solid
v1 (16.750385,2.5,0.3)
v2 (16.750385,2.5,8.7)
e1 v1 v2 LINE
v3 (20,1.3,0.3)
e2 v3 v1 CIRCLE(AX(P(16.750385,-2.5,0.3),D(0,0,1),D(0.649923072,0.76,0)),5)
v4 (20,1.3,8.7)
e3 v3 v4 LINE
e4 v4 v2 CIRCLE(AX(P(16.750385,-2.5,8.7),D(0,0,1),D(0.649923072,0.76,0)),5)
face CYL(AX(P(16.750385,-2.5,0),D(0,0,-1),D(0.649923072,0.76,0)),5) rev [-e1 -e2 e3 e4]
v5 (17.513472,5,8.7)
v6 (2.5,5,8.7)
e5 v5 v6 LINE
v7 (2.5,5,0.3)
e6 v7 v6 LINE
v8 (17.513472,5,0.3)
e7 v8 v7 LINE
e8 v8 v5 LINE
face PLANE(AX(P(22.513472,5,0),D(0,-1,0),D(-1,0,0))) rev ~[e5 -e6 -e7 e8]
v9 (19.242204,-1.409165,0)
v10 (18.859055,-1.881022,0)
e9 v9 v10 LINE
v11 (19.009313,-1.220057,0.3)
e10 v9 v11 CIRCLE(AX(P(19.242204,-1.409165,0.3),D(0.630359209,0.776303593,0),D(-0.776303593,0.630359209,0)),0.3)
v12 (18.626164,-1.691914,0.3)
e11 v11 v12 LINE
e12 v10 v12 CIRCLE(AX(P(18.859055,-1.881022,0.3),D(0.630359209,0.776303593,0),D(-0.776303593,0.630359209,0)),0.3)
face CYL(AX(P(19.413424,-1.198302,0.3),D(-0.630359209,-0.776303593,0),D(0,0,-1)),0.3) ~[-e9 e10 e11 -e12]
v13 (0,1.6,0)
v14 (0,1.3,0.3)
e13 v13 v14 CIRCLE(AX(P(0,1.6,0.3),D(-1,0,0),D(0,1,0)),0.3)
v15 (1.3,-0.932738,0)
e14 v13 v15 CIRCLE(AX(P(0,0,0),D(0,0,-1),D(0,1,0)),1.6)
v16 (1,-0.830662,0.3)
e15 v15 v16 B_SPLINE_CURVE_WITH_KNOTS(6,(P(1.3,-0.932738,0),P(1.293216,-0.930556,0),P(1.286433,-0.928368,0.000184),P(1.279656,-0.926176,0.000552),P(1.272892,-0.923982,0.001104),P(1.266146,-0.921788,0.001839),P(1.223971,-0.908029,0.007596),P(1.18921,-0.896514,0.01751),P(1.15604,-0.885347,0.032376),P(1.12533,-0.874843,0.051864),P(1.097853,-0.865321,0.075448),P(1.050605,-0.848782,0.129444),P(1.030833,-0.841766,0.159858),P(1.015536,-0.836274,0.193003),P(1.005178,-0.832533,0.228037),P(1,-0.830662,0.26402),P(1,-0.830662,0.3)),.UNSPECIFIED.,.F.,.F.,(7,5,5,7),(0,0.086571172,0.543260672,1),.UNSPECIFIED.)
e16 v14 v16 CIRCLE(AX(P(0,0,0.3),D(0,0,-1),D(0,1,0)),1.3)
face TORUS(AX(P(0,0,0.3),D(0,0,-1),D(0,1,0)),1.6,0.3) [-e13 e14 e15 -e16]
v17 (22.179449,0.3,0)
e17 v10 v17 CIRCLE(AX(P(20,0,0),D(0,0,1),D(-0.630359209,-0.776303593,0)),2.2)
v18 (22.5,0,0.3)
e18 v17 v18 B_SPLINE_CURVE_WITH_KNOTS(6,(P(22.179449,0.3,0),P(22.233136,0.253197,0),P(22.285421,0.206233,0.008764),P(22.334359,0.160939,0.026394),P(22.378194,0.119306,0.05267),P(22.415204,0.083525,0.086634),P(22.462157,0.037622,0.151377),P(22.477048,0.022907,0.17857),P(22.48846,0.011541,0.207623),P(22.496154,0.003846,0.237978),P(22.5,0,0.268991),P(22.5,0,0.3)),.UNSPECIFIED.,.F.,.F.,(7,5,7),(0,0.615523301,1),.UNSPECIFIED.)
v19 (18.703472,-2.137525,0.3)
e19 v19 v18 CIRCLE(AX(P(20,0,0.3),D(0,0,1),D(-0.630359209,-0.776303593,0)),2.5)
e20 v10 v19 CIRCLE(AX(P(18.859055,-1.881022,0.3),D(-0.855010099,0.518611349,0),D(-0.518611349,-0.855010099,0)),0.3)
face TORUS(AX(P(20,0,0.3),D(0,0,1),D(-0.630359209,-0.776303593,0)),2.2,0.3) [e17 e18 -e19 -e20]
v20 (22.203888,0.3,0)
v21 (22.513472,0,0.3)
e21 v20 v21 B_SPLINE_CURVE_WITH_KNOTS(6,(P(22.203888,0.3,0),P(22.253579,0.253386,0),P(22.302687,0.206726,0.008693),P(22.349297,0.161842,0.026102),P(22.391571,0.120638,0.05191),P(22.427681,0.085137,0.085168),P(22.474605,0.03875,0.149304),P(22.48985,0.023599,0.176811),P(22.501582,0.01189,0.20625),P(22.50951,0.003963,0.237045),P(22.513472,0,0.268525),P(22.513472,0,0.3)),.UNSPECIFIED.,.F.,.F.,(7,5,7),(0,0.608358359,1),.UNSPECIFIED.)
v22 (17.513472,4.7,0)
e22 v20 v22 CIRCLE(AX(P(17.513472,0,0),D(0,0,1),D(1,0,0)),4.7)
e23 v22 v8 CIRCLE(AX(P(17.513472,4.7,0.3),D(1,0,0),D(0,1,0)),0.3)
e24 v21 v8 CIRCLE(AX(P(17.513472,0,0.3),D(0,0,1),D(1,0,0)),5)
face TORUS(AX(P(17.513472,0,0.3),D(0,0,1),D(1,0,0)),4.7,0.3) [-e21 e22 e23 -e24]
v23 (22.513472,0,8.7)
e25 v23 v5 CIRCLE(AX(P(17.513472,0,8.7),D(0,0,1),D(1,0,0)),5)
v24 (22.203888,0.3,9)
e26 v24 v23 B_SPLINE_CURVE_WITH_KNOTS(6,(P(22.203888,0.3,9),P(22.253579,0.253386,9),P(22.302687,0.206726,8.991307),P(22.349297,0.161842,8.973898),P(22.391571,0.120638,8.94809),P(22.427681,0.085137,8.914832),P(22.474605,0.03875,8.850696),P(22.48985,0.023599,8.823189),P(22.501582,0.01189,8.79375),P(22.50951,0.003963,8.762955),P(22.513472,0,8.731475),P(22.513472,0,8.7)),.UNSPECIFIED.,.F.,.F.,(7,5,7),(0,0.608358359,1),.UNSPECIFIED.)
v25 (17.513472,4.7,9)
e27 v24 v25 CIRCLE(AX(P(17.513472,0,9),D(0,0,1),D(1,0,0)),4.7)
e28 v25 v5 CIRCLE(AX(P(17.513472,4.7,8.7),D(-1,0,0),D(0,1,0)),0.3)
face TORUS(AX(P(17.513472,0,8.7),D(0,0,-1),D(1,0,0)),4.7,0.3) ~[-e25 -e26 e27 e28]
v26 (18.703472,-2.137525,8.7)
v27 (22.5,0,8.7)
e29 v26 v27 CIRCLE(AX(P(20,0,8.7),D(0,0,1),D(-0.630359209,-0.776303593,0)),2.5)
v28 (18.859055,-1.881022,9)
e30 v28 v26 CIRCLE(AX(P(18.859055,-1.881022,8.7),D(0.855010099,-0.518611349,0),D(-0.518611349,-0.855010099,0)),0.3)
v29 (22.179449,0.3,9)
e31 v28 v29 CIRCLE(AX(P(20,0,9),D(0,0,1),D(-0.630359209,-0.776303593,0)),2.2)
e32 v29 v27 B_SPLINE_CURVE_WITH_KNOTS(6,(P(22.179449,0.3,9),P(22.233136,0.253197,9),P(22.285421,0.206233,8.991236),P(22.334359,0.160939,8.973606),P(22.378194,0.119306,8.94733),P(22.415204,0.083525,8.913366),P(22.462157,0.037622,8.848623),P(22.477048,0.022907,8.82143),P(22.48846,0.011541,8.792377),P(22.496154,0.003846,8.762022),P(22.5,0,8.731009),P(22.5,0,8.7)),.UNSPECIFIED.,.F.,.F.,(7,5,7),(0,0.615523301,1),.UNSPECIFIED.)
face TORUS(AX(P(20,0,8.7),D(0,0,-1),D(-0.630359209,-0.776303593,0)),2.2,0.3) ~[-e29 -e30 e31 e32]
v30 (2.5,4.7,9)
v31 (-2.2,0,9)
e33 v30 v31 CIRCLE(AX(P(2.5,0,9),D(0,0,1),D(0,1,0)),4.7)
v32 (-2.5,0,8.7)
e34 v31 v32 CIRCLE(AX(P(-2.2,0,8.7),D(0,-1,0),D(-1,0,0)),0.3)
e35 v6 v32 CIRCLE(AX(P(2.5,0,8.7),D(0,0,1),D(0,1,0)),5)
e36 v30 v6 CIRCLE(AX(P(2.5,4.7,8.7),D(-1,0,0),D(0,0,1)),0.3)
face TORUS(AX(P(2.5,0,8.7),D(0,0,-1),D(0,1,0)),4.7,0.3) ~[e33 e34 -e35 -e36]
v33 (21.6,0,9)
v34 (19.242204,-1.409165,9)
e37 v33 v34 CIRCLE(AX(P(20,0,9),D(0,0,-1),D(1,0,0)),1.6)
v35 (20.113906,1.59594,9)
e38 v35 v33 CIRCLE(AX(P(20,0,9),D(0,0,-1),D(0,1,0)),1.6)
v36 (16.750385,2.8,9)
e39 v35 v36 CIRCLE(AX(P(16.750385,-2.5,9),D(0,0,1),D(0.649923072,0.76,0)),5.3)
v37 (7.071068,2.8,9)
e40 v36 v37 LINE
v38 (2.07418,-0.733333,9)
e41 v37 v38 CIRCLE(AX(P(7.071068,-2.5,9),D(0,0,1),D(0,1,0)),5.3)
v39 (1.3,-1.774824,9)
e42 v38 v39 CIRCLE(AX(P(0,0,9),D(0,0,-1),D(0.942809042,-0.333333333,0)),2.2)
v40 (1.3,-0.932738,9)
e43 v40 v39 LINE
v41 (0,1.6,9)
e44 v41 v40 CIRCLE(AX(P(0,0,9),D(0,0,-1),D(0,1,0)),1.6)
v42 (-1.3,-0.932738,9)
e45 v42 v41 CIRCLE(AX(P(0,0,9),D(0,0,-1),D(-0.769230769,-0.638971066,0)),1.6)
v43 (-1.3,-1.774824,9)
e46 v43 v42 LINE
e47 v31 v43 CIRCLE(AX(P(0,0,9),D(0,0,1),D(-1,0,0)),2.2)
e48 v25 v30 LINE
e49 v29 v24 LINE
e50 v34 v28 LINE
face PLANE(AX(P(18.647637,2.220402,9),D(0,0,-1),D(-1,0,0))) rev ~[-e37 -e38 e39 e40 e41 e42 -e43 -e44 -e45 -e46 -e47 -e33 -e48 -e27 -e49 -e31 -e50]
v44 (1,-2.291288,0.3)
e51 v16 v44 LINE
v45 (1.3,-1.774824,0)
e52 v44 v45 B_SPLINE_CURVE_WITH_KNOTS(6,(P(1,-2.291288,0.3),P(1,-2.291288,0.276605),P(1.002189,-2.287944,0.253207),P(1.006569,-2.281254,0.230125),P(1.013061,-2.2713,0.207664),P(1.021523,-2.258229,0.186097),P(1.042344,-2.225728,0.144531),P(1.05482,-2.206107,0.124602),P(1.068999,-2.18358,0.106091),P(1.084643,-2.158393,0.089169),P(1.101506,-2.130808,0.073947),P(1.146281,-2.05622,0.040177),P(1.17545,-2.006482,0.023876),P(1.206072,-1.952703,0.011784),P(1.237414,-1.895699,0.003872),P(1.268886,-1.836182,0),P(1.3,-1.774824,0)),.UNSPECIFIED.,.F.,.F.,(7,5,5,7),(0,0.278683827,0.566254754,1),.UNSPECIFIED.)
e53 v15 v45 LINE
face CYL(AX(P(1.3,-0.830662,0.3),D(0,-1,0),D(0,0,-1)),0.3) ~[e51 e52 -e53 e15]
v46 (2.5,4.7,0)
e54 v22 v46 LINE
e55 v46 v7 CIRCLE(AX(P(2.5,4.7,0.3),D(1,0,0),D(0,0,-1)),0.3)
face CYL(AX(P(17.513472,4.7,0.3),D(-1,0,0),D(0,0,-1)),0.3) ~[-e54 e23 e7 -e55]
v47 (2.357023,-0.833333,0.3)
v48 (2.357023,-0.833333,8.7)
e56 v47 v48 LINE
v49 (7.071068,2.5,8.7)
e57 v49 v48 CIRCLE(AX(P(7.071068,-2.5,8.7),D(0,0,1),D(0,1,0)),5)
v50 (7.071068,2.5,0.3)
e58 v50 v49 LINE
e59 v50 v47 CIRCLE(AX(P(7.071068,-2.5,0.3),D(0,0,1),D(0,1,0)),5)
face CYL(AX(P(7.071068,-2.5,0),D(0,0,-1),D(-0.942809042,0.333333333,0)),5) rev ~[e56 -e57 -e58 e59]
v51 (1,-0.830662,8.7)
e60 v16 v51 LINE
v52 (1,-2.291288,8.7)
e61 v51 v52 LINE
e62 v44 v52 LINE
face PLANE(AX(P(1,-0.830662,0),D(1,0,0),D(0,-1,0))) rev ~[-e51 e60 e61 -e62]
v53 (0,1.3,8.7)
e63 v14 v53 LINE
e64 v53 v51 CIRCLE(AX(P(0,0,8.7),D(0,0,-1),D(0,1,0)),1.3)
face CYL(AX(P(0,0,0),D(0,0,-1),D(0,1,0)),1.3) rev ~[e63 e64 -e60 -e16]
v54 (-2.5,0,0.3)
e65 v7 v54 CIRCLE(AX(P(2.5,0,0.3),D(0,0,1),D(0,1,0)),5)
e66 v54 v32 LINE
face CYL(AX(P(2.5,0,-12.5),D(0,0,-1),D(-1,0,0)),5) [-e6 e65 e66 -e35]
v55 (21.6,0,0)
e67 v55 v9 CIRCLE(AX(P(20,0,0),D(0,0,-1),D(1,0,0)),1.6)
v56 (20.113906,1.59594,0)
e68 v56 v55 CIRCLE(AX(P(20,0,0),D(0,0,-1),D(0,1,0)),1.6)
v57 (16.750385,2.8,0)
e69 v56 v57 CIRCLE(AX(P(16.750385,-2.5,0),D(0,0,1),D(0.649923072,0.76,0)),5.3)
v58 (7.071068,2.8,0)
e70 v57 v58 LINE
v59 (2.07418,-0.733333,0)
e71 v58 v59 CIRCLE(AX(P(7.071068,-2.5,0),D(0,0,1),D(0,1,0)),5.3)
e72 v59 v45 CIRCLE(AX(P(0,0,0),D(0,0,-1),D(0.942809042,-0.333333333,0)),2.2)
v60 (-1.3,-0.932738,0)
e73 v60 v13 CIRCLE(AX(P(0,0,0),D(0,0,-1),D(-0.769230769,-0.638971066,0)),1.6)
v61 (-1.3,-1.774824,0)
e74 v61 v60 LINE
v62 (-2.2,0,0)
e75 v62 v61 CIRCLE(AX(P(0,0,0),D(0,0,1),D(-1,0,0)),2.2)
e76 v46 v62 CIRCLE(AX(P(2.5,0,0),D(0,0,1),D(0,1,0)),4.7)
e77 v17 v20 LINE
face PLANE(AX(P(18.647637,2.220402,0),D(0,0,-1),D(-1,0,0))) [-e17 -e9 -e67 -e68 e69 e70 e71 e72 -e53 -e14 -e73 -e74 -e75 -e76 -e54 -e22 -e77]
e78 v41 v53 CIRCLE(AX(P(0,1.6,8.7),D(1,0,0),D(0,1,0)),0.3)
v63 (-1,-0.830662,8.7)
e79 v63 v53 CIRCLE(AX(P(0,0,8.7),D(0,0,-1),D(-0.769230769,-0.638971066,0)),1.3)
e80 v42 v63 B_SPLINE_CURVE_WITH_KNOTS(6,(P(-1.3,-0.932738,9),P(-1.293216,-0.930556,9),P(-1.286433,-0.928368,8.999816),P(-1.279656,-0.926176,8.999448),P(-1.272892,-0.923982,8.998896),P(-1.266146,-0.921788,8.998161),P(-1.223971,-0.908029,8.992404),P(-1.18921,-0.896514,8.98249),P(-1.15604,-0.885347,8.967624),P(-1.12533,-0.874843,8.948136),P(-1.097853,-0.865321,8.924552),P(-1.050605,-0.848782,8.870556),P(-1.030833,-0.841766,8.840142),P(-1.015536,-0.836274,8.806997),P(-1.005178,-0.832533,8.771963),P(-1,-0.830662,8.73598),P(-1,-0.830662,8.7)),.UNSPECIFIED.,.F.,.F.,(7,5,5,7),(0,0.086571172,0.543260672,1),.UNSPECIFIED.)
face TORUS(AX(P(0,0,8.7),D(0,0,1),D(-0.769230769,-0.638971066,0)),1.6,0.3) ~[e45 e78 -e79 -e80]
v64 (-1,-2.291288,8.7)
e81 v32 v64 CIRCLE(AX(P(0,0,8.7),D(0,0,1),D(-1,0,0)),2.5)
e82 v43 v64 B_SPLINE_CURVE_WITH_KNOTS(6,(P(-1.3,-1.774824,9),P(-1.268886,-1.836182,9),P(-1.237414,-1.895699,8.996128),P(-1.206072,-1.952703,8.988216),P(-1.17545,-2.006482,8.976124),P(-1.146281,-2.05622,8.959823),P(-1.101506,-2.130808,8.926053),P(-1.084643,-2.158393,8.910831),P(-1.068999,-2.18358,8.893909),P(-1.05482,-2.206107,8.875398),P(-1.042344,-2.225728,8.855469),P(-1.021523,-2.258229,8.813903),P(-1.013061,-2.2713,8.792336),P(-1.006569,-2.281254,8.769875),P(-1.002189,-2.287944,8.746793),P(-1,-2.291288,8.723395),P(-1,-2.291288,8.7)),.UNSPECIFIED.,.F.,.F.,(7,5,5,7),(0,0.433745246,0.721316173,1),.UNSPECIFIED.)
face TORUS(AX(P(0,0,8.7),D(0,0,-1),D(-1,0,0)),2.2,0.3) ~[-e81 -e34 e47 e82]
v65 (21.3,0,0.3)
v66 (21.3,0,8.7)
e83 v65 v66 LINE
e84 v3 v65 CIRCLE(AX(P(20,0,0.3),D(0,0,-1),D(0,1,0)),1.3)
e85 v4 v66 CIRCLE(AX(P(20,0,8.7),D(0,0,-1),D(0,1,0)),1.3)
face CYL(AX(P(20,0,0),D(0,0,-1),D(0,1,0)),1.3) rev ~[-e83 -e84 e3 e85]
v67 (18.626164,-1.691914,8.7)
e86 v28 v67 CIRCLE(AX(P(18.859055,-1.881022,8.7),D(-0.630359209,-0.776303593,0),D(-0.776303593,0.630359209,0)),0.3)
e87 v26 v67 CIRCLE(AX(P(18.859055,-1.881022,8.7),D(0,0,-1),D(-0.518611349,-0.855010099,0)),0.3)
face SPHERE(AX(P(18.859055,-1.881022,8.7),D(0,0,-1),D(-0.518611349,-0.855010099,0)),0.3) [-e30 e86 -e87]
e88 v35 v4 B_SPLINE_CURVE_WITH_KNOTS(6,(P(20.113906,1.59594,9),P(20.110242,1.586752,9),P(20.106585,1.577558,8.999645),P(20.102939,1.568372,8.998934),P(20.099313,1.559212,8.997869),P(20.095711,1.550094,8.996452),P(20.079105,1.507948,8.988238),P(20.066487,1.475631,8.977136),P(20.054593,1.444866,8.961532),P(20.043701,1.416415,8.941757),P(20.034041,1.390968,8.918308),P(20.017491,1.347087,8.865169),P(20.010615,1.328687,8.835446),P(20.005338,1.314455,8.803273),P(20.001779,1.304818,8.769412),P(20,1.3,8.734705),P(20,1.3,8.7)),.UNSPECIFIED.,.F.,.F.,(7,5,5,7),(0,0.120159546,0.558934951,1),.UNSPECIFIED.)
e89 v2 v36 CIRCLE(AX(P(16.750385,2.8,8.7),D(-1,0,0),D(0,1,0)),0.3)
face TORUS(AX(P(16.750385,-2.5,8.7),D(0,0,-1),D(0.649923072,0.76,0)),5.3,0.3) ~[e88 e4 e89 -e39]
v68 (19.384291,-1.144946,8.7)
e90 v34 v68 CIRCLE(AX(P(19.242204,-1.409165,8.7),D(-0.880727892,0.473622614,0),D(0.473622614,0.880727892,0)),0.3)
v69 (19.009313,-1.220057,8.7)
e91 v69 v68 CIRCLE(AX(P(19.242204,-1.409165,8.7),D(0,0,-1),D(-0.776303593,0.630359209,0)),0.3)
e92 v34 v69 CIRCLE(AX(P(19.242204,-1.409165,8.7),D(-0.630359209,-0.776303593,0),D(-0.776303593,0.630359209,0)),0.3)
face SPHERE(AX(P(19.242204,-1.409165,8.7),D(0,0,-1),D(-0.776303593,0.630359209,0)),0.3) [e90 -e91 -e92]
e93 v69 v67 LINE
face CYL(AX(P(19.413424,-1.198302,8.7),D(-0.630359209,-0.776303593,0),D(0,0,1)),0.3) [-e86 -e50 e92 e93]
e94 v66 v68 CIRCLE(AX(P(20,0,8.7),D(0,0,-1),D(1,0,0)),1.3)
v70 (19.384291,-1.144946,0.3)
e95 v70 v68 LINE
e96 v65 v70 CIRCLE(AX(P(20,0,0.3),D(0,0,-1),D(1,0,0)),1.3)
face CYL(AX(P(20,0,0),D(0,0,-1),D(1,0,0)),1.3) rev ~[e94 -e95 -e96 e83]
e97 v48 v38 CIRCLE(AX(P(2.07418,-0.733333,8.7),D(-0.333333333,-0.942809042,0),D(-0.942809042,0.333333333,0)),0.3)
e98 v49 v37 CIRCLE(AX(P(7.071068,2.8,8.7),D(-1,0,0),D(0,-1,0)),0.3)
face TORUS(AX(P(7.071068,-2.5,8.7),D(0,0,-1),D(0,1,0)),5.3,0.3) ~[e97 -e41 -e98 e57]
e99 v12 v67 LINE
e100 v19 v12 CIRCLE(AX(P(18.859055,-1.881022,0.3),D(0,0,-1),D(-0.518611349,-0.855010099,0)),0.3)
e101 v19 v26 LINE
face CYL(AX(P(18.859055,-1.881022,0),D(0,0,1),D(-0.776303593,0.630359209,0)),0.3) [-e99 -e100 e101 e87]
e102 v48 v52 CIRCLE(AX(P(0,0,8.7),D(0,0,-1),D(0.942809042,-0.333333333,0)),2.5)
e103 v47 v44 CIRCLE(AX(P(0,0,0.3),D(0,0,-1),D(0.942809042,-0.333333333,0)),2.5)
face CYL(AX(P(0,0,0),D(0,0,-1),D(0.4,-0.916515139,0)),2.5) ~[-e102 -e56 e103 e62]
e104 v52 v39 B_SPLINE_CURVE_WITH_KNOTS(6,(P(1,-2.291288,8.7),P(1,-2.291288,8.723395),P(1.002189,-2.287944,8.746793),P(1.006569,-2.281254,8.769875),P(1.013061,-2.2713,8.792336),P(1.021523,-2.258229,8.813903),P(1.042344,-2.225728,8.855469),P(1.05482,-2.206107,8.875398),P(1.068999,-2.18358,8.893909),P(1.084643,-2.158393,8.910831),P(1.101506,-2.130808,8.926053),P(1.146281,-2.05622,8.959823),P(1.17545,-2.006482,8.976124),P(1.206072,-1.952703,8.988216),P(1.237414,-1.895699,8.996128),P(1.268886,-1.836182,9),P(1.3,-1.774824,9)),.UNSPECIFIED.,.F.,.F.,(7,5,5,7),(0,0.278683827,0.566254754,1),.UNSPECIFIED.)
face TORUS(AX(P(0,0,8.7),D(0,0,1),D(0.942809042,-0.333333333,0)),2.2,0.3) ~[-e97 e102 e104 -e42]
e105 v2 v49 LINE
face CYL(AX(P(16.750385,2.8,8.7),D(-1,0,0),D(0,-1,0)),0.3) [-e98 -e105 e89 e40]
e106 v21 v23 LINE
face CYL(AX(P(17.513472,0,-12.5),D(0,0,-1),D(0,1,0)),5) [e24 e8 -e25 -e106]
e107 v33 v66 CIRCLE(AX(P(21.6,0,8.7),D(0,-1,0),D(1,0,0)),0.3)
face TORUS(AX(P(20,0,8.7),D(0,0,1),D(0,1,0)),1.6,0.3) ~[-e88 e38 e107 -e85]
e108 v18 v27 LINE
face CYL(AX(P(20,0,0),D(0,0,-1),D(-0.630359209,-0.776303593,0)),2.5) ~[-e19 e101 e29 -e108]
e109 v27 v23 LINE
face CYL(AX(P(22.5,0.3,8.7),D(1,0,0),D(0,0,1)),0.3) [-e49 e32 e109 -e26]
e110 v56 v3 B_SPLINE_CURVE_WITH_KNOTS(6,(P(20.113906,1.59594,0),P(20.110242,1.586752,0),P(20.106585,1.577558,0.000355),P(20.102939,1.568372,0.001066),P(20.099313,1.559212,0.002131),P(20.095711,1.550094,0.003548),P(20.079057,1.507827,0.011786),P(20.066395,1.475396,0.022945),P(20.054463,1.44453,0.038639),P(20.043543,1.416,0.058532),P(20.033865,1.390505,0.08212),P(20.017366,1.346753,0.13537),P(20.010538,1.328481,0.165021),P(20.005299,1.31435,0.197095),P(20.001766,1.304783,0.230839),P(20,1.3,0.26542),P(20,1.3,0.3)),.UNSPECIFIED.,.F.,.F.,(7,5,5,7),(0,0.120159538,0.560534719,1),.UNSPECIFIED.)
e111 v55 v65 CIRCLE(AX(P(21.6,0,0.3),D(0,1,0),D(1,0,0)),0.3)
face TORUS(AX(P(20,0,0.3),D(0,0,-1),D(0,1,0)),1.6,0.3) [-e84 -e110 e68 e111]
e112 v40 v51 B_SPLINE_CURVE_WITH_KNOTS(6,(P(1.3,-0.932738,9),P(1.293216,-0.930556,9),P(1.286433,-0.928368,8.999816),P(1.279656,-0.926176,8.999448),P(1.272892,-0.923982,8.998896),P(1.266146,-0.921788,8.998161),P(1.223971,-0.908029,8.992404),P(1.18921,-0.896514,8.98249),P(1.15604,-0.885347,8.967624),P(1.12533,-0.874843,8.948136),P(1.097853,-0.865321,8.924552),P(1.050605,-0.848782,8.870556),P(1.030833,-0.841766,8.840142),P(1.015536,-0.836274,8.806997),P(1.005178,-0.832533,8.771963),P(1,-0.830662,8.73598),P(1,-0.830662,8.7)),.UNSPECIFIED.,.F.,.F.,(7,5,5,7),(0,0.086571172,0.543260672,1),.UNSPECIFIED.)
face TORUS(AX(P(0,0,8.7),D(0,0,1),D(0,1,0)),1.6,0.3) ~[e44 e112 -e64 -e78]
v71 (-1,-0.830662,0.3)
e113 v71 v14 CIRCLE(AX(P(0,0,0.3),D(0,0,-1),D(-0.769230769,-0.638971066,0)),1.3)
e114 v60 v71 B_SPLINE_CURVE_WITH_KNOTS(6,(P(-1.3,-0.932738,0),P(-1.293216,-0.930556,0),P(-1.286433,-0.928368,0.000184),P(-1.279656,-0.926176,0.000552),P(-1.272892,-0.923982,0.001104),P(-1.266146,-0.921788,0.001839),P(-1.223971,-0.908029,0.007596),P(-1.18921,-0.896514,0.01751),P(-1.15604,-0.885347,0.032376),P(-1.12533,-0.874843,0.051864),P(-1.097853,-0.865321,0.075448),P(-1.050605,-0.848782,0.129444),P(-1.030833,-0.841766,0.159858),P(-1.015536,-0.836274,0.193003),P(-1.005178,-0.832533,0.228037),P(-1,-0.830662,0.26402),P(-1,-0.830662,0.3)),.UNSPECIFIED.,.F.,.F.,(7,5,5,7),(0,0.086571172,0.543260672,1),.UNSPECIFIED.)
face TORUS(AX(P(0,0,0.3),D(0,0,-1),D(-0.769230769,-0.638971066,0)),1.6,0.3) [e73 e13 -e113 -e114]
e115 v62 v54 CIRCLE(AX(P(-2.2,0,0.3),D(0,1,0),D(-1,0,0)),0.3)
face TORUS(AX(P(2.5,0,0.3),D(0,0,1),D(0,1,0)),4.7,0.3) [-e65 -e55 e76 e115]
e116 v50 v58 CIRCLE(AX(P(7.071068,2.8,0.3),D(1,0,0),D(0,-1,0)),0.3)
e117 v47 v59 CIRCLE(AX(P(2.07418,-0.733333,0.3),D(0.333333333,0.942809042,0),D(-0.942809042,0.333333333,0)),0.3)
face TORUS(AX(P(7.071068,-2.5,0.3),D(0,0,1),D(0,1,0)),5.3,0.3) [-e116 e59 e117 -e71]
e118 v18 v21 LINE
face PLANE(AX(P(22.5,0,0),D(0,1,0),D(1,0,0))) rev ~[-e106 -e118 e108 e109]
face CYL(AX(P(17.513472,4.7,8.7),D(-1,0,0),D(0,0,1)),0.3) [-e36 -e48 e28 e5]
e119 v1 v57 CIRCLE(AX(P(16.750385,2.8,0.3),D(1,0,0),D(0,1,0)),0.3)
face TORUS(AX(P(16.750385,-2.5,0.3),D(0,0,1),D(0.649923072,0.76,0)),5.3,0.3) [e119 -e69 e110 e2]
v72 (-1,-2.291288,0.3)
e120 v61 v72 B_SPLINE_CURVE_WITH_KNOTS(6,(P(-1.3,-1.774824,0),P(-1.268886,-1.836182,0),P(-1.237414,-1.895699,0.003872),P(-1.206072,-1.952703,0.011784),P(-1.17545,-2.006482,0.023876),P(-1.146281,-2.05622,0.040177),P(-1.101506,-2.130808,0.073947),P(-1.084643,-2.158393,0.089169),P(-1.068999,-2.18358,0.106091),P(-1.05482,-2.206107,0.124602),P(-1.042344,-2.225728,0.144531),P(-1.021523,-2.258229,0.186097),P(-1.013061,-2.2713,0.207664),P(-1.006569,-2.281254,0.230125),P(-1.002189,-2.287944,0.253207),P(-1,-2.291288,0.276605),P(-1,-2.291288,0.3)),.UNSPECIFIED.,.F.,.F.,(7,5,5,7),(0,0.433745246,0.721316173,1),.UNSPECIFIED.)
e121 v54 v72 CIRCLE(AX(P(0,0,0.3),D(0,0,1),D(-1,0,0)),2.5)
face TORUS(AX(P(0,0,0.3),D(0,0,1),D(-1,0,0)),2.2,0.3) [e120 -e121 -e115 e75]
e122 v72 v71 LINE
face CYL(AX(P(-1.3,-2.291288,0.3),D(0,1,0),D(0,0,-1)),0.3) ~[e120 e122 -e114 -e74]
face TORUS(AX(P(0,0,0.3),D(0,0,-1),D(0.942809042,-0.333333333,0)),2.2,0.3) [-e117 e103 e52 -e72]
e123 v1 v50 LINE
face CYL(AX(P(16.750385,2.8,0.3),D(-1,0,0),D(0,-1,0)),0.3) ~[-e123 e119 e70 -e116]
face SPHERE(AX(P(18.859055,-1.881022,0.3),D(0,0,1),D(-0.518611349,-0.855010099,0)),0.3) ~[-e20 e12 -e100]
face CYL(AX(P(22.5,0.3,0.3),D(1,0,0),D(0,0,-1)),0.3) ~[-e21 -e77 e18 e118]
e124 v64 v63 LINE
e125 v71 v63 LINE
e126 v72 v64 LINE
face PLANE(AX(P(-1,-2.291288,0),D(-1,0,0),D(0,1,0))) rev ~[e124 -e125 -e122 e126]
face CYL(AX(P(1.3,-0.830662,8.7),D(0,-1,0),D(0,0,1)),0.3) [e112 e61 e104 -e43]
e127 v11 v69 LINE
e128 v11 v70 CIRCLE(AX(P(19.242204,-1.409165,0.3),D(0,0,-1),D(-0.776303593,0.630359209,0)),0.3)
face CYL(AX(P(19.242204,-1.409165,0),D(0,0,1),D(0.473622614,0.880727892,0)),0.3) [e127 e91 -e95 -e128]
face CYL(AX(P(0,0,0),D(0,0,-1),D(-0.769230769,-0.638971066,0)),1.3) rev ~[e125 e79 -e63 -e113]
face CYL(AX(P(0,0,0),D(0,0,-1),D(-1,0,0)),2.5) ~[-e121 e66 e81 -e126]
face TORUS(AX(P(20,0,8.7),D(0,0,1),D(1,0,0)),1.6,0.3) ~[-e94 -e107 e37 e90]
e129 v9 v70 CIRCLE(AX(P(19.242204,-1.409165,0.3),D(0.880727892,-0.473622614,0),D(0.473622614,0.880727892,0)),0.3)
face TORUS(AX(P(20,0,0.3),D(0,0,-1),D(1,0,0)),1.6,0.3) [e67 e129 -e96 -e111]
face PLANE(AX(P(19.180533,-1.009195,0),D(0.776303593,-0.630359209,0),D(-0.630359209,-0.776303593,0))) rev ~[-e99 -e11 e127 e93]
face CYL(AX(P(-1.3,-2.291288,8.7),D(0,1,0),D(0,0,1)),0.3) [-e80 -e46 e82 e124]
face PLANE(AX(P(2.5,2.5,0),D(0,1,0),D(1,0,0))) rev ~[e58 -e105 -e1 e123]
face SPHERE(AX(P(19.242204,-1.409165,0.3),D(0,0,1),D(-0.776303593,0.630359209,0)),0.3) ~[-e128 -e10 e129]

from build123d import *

# Parameters (mm, degrees)
F1_DEPTH    = 9
F2_T1_DEPTH = 9
F2_T3_DEPTH = 9
F2_T5_DEPTH = 34
F2_T7_DEPTH = 34
F3_R        = 0.3


# Not quite as in the source:
# - a fillet or chamfer that OpenCascade refuses, or shapes differently, is made with other operations: its cross-section is extruded or revolved along the edge and cut away or added


with BuildPart() as f1:
    # F0 (on Top) → F1 (new body)
    with BuildSketch(Plane.XY):
        with BuildLine():
            Line((-2.5, 5), (-2.5, 0))
            ThreePointArc((-2.5, 0), (-2.0916500663, -1.3693063938), (-1, -2.2912878475))
            Line((-1, -2.2912878475), (-1, -0.8306623863))
            ThreePointArc((-1, -0.8306623863), (-1.1768307232, 0.5523309234), (0, 1.3))
            ThreePointArc((0, 1.3), (1.1768307232, 0.5523309234), (1, -0.8306623863))
            Line((1, -0.8306623863), (1, -2.2912878475))
            ThreePointArc((1, -2.2912878475), (2.0916500663, -1.3693063938), (2.5, 0))
            Line((2.5, 0), (2.5, 2.5))
            Line((2.5, 2.5), (20, 2.5))
            ThreePointArc((20, 2.5), (21.767766953, 1.767766953), (22.5, 0))
            Line((22.5, 0), (22.5134724528, 0))
            Line((22.5134724528, 0), (22.5134724528, 5))
            Line((22.5134724528, 5), (-2.5, 5))
        make_face()
        with BuildLine():
            ThreePointArc((18.4241019781, -1.9407589815), (21.074768567, -2.2571824311), (22.5, 0))
            Line((22.5, 0), (21.3, 0))
            ThreePointArc((21.3, 0), (20.5588796548, -1.1737348642), (19.1805330286, -1.0091946704))
            Line((19.1805330286, -1.0091946704), (18.4241019781, -1.9407589815))
        make_face()
        with BuildLine():
            Line((21.3, 0), (22.5, 0))
            ThreePointArc((22.5, 0), (21.767766953, 1.767766953), (20, 2.5))
            Line((20, 2.5), (20, 1.3))
            ThreePointArc((20, 1.3), (20.9192388155, 0.9192388155), (21.3, 0))
        make_face()
    extrude(amount=F1_DEPTH)

    # F2: fillet of radius 5 on 4 edges, made by hand

    # F2_s2 → F2_t1 (join)
    with BuildSketch(Plane.XY):
        with BuildLine():
            ThreePointArc((2.357022604, -0.8333333333), (4.1843164659, 1.5824829046), (7.0710678119, 2.5))
            Line((7.0710678119, 2.5), (7.0710678119, 3))
            Line((7.0710678119, 3), (2.5, 3))
            Line((2.5, 3), (2, 2.5))
            ThreePointArc((2, 2.5), (2, 0), (1.8856180832, -0.6666666667))
            Line((1.8856180832, -0.6666666667), (2.357022604, -0.8333333333))
        make_face()
    extrude(amount=F2_T1_DEPTH)

    # F2_s4 → F2_t3 (join)
    with BuildSketch(Plane.XY):
        with BuildLine():
            ThreePointArc((20, 1.3), (18.4824354457, 2.1904157598), (16.7503846381, 2.5))
            Line((16.7503846381, 2.5), (20, 2.5))
            Line((20, 2.5), (20, 1.3))
        make_face()
    extrude(amount=F2_T3_DEPTH)

    # F2_s6 → F2_t5 (cut)
    with BuildSketch(Plane.XY.offset(-12.5)):
        with BuildLine():
            ThreePointArc((-2.5, 0), (-1.0355339059, 3.5355339059), (2.5, 5))
            Line((2.5, 5), (-2.5, 5))
            Line((-2.5, 5), (-2.5, 0))
        make_face()
    extrude(amount=F2_T5_DEPTH, mode=Mode.SUBTRACT)

    # F2_s8 → F2_t7 (cut)
    with BuildSketch(Plane.XY.offset(-12.5)):
        with BuildLine():
            ThreePointArc((17.5134724528, 5), (21.0490063587, 3.5355339059), (22.5134724528, 0))
            Line((22.5134724528, 0), (22.5134724528, 5))
            Line((22.5134724528, 5), (17.5134724528, 5))
        make_face()
    extrude(amount=F2_T7_DEPTH, mode=Mode.SUBTRACT)

    # F3
    f3_edges = [f1.edges().sort_by_distance(p)[0] for p in [
        (22.506736, 0, 9),
        (21.074769, -2.257182, 9),
        (18.802318, -1.474977, 9),
        (21.225143, -0.434768, 9),
        (18.482435, 2.190416, 9),
        (11.910726, 2.5, 9),
        (4.184316, 1.582483, 9),
        (1.829975, -1.703289, 9),
        (1, -1.560975, 9),
        (0, 1.3, 9),
        (-1, -1.560975, 9),
        (-2.09165, -1.369306, 9),
        (-1.035534, 3.535534, 9),
        (10.006736, 5, 9),
        (21.049006, 3.535534, 9),
        (22.506736, 0, 0),
        (21.074769, -2.257182, 0),
        (18.802318, -1.474977, 0),
        (21.225143, -0.434768, 0),
        (18.482435, 2.190416, 0),
        (11.910726, 2.5, 0),
        (4.184316, 1.582483, 0),
        (1.829975, -1.703289, 0),
        (1, -1.560975, 0),
        (0, 1.3, 0),
        (-1, -1.560975, 0),
        (-2.09165, -1.369306, 0),
        (-1.035534, 3.535534, 0),
        (10.006736, 5, 0),
        (21.049006, 3.535534, 0),
        (19.180533, -1.009195, 4.5),
        (18.424102, -1.940759, 4.5),
    ]]
    fillet(f3_edges, radius=F3_R)


solid = f1.part
